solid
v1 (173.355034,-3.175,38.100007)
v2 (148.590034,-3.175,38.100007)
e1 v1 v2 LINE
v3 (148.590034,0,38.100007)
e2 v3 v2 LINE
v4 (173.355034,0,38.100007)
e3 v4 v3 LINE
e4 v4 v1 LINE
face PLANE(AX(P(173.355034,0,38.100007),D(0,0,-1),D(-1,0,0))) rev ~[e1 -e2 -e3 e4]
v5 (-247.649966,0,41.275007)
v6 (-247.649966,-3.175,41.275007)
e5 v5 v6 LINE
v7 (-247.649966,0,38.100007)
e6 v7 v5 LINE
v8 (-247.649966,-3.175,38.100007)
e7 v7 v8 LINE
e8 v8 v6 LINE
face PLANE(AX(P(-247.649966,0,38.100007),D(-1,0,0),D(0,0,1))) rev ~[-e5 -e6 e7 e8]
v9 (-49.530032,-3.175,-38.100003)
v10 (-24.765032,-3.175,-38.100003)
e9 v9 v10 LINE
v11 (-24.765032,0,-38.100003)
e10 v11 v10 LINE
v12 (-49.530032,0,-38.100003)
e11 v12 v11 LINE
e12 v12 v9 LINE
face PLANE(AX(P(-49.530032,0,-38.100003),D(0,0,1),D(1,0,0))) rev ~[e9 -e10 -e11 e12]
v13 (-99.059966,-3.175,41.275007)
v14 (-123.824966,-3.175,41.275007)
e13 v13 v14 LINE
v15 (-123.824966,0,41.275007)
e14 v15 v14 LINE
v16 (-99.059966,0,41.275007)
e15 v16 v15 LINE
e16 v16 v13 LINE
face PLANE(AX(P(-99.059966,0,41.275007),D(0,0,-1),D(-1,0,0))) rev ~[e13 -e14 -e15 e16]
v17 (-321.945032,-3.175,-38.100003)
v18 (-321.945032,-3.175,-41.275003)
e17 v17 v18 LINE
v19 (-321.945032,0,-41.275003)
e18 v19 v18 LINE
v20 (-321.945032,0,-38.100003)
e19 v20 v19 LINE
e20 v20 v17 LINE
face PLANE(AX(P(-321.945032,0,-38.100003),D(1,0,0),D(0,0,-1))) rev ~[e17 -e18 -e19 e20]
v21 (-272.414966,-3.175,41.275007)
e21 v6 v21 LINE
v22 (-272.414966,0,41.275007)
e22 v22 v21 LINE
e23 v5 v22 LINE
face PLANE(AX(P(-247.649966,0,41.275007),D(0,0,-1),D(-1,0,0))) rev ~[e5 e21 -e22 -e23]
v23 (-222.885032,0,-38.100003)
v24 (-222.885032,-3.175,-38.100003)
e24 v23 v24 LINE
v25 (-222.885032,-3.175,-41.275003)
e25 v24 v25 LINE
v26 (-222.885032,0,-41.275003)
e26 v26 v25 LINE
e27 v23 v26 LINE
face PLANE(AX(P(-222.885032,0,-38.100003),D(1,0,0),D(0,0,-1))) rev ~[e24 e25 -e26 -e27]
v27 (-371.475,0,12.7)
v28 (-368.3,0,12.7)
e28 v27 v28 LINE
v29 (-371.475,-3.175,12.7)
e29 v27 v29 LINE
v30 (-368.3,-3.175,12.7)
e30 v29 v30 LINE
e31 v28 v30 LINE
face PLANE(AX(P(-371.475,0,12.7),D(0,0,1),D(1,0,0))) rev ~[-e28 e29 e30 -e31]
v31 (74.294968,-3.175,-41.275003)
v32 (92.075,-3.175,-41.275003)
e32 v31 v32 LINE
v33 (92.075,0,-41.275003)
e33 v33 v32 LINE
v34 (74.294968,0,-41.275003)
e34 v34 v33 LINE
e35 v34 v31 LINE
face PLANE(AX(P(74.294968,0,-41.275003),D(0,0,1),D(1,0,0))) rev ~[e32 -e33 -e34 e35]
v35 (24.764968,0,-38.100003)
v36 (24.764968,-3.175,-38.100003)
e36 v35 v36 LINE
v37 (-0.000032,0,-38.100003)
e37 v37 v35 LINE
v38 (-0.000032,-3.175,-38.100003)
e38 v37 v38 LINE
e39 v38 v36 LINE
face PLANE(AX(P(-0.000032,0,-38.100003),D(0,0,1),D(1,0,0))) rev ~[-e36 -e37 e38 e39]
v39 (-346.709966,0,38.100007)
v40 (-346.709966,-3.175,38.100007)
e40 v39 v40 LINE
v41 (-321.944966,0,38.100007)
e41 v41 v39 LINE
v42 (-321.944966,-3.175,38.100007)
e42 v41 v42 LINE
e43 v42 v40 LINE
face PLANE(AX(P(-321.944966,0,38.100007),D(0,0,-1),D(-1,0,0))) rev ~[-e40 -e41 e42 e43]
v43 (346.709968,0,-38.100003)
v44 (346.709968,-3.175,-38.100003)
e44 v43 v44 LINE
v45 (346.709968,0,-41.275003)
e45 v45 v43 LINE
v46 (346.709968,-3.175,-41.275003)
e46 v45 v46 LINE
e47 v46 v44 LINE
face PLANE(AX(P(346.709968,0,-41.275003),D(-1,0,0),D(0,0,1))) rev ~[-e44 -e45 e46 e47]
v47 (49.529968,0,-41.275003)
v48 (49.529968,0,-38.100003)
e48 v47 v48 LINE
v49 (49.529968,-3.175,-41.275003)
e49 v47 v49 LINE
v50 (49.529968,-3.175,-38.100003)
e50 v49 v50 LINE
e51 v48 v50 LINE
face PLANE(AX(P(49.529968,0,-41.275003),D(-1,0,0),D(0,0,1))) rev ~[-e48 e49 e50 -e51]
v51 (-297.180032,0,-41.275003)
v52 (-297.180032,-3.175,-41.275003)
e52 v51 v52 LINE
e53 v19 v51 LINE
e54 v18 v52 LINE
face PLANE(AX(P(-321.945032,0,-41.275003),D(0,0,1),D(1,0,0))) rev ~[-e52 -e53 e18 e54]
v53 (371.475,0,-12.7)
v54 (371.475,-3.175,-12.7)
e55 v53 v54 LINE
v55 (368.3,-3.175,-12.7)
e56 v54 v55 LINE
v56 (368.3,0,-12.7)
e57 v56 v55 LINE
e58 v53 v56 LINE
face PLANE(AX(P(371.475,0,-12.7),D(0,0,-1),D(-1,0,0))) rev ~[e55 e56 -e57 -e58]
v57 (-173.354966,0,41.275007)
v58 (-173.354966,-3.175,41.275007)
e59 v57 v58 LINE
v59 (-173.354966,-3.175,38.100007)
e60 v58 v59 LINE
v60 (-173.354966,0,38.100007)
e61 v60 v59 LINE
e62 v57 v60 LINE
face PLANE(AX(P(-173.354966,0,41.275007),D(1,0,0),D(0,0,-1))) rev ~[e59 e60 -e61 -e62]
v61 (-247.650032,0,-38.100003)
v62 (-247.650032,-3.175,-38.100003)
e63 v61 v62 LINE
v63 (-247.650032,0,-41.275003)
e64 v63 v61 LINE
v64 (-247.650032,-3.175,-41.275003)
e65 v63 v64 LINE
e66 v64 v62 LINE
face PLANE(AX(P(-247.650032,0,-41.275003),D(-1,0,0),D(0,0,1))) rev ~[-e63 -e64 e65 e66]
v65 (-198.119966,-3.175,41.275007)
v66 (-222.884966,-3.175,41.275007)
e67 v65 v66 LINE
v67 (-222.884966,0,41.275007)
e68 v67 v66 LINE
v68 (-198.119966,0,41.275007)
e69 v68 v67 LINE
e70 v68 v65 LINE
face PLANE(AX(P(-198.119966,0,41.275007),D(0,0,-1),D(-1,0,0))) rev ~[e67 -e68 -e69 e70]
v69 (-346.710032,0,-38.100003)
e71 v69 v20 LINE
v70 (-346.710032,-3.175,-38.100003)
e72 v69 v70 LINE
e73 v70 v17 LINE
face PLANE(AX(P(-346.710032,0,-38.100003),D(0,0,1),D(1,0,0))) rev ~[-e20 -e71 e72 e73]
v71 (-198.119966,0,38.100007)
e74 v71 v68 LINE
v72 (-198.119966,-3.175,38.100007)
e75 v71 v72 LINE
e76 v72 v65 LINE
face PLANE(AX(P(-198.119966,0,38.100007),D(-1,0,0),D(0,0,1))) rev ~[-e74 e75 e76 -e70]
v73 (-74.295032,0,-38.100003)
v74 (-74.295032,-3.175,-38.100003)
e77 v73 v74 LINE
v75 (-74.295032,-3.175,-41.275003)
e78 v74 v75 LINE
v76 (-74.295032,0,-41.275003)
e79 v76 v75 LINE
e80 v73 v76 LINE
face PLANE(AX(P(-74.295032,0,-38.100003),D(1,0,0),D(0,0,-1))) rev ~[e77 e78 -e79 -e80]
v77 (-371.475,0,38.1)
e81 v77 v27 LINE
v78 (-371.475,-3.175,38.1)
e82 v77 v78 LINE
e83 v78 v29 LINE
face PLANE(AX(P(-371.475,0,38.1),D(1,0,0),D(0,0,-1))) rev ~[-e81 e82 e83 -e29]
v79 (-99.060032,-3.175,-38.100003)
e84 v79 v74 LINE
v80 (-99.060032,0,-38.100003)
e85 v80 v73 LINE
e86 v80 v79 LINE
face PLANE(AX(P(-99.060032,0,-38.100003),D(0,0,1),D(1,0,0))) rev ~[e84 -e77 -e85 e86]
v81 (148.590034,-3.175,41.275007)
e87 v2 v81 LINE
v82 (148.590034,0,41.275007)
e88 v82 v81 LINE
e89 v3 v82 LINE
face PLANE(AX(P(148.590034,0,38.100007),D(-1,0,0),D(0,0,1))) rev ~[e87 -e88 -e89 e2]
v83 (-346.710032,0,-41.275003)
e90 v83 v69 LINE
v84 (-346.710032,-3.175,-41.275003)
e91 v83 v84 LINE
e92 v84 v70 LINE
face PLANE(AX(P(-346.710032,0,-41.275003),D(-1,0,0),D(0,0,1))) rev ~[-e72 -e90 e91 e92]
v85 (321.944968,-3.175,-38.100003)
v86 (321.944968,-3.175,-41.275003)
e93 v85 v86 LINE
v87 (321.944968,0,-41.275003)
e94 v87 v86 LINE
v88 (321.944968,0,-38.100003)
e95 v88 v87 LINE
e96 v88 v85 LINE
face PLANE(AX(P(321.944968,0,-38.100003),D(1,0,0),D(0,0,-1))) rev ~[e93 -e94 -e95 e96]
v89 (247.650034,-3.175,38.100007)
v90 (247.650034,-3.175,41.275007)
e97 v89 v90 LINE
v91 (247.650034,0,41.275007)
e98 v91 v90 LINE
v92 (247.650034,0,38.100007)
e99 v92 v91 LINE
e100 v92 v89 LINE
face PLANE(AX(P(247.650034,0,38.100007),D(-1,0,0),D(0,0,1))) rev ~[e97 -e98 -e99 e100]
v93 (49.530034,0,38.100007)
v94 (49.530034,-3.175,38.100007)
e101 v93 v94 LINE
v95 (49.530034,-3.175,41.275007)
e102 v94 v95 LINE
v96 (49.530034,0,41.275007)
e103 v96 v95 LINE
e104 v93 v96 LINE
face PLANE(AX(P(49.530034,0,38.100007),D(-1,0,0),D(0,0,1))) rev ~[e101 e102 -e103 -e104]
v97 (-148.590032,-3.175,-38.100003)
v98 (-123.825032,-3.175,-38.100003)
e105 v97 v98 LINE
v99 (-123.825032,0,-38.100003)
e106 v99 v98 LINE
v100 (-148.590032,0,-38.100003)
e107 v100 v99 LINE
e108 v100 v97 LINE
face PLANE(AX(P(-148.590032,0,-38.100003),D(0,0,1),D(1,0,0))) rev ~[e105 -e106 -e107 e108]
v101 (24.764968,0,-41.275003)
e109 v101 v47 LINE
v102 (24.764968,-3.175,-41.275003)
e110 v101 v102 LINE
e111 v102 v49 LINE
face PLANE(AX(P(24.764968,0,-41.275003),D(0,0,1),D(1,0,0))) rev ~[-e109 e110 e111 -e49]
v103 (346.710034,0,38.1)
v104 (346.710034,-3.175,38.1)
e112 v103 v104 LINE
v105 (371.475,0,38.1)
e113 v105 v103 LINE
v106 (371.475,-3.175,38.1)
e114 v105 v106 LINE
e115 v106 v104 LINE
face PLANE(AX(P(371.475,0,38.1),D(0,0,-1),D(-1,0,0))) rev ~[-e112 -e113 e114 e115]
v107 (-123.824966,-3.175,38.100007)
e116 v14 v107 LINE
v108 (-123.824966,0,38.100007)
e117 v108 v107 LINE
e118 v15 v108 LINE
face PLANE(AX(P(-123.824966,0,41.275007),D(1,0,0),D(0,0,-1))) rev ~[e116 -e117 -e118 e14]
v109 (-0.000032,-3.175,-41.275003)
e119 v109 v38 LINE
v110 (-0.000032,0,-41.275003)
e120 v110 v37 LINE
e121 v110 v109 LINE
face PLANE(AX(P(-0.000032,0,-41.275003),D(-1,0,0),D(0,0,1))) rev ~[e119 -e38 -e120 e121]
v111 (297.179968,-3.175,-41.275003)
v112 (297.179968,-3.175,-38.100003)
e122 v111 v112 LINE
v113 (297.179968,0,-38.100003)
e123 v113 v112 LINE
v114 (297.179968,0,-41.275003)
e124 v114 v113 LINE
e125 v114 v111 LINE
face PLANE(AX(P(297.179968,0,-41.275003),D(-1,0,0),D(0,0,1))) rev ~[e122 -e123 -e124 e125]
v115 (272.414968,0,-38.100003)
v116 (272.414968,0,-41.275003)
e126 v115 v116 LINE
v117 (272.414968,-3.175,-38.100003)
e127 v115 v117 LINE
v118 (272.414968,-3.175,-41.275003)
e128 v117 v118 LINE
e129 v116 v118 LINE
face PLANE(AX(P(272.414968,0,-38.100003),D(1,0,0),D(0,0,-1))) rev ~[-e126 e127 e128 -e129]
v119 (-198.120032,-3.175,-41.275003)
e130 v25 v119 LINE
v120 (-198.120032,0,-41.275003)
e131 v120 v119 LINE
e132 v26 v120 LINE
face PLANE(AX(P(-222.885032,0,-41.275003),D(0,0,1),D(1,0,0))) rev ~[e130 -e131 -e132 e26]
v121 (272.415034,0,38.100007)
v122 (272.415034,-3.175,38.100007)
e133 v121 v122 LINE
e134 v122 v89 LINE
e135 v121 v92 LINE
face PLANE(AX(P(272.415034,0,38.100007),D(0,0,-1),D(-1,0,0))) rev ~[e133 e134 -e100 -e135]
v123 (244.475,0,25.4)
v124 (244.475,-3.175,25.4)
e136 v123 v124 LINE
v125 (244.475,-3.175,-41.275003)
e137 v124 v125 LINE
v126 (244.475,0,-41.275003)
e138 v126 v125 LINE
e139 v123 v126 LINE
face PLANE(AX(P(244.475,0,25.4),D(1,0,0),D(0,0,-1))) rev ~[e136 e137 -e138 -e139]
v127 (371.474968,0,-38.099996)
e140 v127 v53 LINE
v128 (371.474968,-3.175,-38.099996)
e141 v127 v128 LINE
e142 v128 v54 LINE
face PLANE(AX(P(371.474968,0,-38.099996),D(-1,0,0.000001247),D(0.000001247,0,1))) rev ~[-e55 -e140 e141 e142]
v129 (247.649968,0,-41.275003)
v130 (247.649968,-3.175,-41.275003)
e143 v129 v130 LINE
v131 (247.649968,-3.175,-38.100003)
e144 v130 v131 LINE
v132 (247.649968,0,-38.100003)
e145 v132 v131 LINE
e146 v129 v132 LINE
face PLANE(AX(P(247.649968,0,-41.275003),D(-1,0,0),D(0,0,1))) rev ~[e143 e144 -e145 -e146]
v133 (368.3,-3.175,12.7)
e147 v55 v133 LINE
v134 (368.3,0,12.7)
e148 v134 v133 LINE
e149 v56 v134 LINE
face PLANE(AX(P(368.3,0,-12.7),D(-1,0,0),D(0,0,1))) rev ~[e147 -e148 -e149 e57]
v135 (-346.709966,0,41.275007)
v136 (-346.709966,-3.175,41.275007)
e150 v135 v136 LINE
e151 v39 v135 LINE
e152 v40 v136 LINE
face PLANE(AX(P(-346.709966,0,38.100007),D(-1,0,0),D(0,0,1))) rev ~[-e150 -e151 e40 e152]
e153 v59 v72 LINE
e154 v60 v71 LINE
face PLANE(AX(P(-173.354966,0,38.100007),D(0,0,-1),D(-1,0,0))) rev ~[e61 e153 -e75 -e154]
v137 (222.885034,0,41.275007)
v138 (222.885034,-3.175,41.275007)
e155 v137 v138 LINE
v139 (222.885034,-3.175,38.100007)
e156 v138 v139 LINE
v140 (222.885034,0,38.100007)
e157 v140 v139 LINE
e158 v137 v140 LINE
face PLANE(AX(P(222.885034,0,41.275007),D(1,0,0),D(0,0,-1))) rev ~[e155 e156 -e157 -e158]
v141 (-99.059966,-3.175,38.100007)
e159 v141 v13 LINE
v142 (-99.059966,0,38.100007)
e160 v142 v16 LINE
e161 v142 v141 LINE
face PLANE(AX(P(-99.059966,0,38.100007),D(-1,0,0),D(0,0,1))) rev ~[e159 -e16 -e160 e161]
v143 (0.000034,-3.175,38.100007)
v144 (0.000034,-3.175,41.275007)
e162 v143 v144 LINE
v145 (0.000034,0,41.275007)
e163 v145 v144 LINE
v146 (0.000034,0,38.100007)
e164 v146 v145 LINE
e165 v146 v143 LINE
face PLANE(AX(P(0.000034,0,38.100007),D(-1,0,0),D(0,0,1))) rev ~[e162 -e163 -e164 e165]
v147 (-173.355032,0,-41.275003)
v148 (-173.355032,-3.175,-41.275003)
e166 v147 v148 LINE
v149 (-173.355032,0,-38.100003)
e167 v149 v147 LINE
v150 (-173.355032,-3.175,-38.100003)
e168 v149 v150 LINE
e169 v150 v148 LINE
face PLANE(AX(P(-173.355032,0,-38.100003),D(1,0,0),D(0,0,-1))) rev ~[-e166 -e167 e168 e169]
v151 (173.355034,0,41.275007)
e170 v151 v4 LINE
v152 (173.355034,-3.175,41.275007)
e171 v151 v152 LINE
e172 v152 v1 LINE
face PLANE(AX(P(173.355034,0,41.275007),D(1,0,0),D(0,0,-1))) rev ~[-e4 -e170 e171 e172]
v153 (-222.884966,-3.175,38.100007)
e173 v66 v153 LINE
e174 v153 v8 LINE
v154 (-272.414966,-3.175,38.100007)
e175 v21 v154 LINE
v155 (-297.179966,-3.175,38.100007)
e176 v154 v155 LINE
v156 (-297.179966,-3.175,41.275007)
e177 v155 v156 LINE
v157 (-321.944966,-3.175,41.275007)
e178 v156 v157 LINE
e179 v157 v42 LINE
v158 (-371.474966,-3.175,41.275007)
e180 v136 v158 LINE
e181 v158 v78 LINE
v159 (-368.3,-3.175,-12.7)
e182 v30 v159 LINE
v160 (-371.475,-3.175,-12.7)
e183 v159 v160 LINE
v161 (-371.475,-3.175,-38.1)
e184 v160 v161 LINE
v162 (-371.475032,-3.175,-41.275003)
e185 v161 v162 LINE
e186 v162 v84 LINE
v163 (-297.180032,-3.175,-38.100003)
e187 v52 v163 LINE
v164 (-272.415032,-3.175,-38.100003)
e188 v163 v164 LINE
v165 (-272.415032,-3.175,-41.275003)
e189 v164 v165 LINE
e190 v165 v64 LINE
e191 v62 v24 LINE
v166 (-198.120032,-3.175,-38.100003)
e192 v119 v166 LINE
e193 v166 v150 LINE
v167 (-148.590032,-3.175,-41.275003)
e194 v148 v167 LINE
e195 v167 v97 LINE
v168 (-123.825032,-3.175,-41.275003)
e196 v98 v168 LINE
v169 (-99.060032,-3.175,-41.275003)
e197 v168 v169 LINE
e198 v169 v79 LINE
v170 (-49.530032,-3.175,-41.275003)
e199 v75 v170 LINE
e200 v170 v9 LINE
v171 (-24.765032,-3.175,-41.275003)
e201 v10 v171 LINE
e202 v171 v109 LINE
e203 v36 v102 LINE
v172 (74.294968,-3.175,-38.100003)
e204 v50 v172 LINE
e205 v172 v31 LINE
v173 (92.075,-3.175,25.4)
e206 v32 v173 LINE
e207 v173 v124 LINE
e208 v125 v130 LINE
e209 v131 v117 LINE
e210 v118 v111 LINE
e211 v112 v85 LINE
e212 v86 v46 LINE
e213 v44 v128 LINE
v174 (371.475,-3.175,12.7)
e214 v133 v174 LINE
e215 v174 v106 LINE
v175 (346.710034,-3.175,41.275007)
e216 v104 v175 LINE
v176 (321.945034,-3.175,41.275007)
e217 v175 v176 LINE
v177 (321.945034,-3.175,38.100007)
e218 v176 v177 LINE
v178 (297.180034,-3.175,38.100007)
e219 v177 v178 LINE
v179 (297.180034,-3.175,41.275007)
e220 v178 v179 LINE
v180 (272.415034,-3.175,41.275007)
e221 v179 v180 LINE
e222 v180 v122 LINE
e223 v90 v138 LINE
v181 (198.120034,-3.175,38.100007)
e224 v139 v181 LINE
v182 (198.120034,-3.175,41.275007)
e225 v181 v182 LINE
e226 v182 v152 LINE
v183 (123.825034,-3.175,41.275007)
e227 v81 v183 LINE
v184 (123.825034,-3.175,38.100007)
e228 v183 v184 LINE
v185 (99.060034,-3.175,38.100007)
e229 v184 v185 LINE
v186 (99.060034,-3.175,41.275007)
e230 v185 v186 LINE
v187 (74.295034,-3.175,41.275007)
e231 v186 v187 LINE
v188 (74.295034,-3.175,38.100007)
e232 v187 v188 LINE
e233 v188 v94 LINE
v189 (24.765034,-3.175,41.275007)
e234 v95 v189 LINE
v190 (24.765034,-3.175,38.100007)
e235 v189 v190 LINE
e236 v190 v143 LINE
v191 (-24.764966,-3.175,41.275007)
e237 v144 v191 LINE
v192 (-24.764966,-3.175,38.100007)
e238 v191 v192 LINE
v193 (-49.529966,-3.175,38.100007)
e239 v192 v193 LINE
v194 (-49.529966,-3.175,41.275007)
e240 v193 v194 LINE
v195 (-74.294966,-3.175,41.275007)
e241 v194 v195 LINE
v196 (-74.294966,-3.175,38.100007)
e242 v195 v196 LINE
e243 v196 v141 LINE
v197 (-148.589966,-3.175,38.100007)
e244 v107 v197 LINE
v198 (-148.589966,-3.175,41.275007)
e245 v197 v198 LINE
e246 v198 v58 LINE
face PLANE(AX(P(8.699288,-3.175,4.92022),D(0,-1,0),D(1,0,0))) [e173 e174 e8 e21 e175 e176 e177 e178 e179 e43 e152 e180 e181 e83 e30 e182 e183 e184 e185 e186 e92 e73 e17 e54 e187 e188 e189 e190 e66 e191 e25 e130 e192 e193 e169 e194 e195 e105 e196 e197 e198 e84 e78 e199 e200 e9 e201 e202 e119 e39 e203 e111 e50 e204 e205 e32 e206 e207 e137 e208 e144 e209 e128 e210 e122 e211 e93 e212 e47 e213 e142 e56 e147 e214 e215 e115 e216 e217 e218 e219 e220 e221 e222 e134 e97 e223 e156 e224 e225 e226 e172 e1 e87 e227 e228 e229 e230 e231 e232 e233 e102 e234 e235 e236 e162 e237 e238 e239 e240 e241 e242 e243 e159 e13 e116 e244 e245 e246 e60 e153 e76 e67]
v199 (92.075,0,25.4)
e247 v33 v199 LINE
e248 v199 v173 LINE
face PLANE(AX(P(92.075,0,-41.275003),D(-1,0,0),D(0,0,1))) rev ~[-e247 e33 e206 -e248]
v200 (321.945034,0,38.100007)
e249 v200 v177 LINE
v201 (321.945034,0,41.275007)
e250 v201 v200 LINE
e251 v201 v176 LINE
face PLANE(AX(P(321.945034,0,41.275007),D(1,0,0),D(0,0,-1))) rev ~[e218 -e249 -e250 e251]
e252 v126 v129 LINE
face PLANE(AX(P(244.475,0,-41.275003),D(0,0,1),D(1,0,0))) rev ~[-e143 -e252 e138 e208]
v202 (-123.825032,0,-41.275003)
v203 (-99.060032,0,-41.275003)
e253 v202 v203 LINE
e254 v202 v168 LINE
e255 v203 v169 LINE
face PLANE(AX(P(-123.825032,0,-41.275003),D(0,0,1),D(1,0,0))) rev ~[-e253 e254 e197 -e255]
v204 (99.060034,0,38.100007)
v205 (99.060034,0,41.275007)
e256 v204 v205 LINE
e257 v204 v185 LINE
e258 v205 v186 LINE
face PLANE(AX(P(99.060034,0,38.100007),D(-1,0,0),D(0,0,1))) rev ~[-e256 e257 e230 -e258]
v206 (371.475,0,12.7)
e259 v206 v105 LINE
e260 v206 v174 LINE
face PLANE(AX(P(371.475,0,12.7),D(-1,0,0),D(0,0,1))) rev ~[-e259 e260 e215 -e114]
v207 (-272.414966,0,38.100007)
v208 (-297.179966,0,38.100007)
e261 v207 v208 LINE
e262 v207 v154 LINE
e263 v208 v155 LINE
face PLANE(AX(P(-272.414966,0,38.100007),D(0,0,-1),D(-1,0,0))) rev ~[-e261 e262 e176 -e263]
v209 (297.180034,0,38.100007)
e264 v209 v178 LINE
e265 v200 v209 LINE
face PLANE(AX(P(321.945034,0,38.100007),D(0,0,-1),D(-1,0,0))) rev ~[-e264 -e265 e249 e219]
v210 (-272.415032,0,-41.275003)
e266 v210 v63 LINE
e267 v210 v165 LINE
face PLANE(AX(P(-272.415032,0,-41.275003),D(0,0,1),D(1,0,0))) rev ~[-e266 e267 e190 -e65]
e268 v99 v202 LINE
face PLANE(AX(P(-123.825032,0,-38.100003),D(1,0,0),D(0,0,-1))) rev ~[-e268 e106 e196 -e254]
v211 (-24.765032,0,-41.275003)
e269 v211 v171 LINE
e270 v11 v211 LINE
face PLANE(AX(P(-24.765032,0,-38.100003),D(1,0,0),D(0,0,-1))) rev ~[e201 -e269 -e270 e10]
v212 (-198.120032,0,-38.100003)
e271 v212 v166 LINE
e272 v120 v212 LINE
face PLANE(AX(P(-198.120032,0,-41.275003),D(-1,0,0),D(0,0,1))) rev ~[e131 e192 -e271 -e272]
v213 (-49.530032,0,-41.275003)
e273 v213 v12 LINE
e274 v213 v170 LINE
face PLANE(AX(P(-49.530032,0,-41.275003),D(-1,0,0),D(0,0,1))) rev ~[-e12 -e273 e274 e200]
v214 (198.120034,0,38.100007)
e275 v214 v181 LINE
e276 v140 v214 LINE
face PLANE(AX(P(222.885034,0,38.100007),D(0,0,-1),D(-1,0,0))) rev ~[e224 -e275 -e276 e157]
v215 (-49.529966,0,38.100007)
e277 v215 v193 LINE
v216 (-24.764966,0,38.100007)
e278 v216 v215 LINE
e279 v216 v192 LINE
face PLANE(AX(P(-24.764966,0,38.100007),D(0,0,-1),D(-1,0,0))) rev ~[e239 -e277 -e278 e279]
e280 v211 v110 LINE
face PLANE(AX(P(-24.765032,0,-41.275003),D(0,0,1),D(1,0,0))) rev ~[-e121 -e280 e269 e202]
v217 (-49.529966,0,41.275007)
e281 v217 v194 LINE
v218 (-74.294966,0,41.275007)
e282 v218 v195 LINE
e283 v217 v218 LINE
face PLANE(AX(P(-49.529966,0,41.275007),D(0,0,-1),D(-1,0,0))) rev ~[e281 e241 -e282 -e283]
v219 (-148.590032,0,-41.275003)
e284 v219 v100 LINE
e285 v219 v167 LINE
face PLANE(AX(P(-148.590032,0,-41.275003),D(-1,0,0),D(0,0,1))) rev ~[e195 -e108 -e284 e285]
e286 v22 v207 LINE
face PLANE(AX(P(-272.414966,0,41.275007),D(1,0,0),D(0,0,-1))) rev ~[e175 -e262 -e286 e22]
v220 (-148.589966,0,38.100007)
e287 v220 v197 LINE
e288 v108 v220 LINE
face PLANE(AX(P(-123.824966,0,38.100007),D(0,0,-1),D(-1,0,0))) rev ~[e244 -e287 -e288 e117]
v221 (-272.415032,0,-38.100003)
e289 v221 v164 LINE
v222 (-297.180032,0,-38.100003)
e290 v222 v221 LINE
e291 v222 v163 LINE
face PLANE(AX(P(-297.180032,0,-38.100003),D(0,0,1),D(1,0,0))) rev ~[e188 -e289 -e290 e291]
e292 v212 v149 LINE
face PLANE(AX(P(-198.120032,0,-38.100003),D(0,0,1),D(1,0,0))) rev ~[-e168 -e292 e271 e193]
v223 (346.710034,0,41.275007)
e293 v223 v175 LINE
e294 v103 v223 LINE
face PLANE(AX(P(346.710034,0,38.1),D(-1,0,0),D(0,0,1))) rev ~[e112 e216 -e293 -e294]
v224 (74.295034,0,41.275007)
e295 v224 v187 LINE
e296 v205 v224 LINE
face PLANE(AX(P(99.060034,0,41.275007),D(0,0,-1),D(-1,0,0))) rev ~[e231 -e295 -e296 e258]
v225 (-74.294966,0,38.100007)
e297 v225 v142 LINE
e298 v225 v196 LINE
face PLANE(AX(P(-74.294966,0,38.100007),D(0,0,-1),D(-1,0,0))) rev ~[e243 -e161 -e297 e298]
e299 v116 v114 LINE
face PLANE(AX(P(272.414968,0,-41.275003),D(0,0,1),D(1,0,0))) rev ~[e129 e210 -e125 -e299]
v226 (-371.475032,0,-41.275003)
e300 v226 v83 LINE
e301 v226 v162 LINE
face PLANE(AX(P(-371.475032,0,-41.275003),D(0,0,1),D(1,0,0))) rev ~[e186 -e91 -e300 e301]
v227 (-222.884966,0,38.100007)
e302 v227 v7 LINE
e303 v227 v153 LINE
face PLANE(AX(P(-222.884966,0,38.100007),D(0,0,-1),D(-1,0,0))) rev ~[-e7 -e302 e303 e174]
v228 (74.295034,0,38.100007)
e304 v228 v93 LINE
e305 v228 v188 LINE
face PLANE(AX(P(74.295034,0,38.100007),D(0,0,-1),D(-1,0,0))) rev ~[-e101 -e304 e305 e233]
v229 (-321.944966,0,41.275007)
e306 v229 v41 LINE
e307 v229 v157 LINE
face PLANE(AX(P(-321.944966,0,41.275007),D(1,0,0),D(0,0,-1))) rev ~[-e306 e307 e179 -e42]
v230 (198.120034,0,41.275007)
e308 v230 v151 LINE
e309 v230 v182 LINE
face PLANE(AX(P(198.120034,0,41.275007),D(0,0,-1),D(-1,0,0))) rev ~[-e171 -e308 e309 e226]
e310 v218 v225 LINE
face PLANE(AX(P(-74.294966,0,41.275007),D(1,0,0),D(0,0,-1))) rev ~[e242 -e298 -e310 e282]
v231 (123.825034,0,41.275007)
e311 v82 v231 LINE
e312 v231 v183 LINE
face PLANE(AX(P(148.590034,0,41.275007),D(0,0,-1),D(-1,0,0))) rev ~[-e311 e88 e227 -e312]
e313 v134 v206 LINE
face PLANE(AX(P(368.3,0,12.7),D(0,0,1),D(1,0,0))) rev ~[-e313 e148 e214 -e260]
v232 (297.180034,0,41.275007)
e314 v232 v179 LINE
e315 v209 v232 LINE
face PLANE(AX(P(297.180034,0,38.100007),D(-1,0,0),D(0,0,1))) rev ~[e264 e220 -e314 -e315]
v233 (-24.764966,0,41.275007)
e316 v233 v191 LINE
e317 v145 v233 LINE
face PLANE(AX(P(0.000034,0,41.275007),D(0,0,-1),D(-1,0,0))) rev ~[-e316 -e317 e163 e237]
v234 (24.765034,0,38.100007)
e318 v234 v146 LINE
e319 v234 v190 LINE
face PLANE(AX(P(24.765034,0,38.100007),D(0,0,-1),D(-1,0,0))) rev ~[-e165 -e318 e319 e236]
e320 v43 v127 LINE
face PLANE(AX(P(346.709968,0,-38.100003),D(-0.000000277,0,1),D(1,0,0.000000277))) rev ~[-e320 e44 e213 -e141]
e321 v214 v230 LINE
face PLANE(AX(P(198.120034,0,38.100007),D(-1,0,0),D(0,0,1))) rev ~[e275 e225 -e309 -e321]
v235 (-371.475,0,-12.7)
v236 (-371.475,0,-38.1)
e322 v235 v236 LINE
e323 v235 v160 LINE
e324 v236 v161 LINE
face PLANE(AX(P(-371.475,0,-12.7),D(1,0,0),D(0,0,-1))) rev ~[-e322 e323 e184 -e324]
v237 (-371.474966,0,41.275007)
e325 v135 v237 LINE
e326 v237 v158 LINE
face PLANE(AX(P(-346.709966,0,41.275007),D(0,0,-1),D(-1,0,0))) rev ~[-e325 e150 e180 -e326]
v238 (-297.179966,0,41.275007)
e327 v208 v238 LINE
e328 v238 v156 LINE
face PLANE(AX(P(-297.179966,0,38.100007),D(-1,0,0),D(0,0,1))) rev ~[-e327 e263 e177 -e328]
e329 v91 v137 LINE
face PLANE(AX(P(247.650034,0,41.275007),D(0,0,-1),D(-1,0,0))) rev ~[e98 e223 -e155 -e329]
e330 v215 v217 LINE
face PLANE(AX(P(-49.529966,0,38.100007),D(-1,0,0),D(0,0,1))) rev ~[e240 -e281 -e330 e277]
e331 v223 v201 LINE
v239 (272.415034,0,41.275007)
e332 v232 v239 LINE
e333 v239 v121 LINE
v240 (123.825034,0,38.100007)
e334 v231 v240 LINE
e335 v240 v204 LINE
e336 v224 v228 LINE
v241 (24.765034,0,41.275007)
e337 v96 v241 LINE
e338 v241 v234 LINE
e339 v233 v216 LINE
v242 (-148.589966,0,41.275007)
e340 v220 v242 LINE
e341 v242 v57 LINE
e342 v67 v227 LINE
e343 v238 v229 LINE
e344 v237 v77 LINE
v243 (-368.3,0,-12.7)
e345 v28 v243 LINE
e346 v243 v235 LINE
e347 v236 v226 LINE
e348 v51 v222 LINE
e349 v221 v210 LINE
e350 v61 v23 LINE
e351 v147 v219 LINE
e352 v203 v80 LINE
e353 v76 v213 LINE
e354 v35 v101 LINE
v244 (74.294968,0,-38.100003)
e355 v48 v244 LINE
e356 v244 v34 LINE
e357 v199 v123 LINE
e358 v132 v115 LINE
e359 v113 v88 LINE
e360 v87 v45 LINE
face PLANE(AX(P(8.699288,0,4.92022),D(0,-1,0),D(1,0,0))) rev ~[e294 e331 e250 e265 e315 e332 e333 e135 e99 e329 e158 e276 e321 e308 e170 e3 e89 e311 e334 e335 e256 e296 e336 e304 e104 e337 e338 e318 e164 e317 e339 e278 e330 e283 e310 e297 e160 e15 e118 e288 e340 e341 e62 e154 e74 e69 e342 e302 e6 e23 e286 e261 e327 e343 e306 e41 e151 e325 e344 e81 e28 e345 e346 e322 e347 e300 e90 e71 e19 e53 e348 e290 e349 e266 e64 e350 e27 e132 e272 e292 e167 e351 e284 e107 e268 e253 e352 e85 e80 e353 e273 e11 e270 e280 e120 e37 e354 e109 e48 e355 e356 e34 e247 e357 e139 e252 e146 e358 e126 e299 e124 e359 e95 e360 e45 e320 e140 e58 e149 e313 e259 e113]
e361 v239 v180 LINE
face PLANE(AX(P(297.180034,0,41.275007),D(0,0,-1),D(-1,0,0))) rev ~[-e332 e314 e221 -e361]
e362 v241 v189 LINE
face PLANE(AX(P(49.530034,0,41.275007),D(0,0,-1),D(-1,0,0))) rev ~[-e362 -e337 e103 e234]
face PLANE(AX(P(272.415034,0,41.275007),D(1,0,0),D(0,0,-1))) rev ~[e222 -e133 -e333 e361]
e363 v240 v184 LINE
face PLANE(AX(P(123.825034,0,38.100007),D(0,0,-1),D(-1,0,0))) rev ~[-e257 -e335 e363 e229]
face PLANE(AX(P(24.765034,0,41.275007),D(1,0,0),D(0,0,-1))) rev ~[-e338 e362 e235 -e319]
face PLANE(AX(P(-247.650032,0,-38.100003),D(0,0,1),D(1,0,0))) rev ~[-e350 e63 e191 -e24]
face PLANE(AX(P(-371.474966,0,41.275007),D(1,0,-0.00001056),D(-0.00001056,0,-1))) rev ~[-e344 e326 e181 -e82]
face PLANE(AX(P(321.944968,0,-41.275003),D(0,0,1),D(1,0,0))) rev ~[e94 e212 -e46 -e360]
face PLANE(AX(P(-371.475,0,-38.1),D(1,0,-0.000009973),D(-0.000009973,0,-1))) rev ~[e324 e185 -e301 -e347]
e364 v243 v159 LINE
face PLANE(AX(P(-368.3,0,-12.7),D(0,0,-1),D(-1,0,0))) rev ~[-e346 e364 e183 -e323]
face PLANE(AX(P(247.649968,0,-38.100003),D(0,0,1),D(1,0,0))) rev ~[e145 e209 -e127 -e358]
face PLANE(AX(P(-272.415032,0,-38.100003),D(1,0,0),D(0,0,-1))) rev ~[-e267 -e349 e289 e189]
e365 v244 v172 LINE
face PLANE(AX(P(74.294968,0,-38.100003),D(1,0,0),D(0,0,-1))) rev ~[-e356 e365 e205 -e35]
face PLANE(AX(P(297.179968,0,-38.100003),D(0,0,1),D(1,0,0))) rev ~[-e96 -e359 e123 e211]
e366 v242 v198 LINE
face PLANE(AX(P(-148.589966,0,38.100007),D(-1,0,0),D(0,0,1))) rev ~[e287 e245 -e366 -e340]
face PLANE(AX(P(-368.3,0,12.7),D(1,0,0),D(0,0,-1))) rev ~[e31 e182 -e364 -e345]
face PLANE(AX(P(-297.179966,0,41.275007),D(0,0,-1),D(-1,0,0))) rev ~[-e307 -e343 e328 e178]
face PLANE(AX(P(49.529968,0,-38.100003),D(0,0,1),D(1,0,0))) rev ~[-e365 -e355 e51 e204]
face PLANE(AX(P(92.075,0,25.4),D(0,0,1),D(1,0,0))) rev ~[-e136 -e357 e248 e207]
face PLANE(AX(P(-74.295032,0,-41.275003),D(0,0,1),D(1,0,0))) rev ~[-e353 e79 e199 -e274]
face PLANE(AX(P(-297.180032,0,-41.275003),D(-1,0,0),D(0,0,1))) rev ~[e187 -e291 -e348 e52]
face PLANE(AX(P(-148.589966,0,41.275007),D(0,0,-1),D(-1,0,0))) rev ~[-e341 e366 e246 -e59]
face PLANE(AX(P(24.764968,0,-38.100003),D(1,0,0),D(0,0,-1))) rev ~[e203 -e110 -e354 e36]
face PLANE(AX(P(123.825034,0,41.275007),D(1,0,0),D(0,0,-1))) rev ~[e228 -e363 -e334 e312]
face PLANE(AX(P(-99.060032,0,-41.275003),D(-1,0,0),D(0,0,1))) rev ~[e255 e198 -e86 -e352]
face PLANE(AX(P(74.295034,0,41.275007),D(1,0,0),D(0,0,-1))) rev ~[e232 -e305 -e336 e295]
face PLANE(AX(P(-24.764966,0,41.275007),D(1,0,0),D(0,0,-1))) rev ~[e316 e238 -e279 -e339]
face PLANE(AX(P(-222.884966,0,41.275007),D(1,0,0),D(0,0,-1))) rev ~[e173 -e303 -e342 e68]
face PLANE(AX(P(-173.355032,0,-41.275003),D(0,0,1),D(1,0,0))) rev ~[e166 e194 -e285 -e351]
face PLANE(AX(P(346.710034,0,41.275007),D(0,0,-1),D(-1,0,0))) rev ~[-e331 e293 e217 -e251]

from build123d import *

# Parameters (mm, degrees)
F1_DEPTH = 3.175


# Not quite as in the source:
# - ends of sketch curves that miss each other by under 0.0002 mm in the source are joined


with BuildPart() as f1:
    # F0 (on Front) → F1 (new body)
    with BuildSketch(Plane.XZ):
        Polygon((92.075, 25.4), (244.475, 25.4), (244.475, -38.1), (244.475, -41.2750032454), (247.649968335, -41.2750032454), (247.649968335, -38.1000032454), (272.414968335, -38.1000032454), (272.414968335, -41.2750032454), (297.179968335, -41.2750032454), (297.179968335, -38.1000032454), (321.944968335, -38.1000032454), (321.944968335, -41.2750032454), (346.709968335, -41.2750032453), (346.709968335, -38.1000032454), (371.474968335, -38.0999963909), (371.475, -12.7), (368.3, -12.7), (368.3, 12.7), (371.475, 12.7), (371.475, 38.1), (368.3, 38.1), (346.7100335276, 38.1), (346.7100335276, 41.2750068545), (321.9450335276, 41.2750068544), (321.9450335276, 38.1000068545), (297.1800335276, 38.1000068545), (297.1800335276, 41.2750068545), (272.4150335276, 41.2750068545), (272.4150335276, 38.1000068545), (247.6500335276, 38.1000068545), (247.6500335276, 41.2750068545), (222.8850335276, 41.2750068545), (222.8850335276, 38.1000068545), (198.1200335276, 38.1000068545), (198.1200335276, 41.2750068545), (173.3550335276, 41.2750068545), (173.3550335276, 38.1000068545), (148.5900335276, 38.1000068545), (148.5900335276, 41.2750068545), (123.8250335276, 41.2750068545), (123.8250335276, 38.1000068545), (99.0600335276, 38.1000068545), (99.0600335276, 41.2750068545), (74.2950335276, 41.2750068545), (74.2950335276, 38.1000068545), (49.5300335276, 38.1000068545), (49.5300335276, 41.2750068545), (24.7650335276, 41.2750068545), (24.7650335276, 38.1000068545), (3.35276e-05, 38.1000068545), (3.35276e-05, 41.2750068545), (-24.7649664724, 41.2750068545), (-24.7649664724, 38.1000068545), (-49.5299664724, 38.1000068545), (-49.5299664724, 41.2750068545), (-74.2949664724, 41.2750068545), (-74.2949664724, 38.1000068545), (-99.0599664724, 38.1000068545), (-99.0599664724, 41.2750068545), (-123.8249664724, 41.2750068545), (-123.8249664724, 38.1000068545), (-148.5899664724, 38.1000068545), (-148.5899664724, 41.2750068545), (-173.3549664724, 41.2750068545), (-173.3549664724, 38.1000068545), (-198.1199664724, 38.1000068545), (-198.1199664724, 41.2750068545), (-222.8849664724, 41.2750068545), (-222.8849664724, 38.1000068545), (-247.6499664724, 38.1000068545), (-247.6499664724, 41.2750068545), (-272.4149664724, 41.2750068545), (-272.4149664724, 38.1000068545), (-297.1799664724, 38.1000068545), (-297.1799664724, 41.2750068545), (-321.9449664724, 41.2750068545), (-321.9449664724, 38.1000068545), (-346.7099664724, 38.1000068545), (-346.7099664724, 41.2750068545), (-371.4749664724, 41.2750068545), (-371.475, 38.1), (-371.475, 12.7), (-368.3, 12.7), (-368.3, -12.7), (-371.475, -12.7), (-371.475, -38.1), (-371.475031665, -41.2750032454), (-346.710031665, -41.2750032454), (-346.710031665, -38.1000032454), (-321.945031665, -38.1000032454), (-321.945031665, -41.2750032454), (-297.180031665, -41.2750032454), (-297.180031665, -38.1000032454), (-272.415031665, -38.1000032454), (-272.415031665, -41.2750032454), (-247.650031665, -41.2750032454), (-247.650031665, -38.1000032454), (-222.885031665, -38.1000032454), (-222.885031665, -41.2750032454), (-198.120031665, -41.2750032454), (-198.120031665, -38.1000032454), (-173.355031665, -38.1000032454), (-173.355031665, -41.2750032454), (-148.590031665, -41.2750032454), (-148.590031665, -38.1000032454), (-123.825031665, -38.1000032454), (-123.825031665, -41.2750032454), (-99.060031665, -41.2750032454), (-99.060031665, -38.1000032454), (-74.295031665, -38.1000032454), (-74.295031665, -41.2750032454), (-49.530031665, -41.2750032454), (-49.530031665, -38.1000032454), (-24.765031665, -38.1000032454), (-24.765031665, -41.2750032454), (-3.1665e-05, -41.2750032454), (-3.1665e-05, -38.1000032454), (24.764968335, -38.1000032454), (24.764968335, -41.2750032454), (49.529968335, -41.2750032454), (49.529968335, -38.1000032454), (74.294968335, -38.1000032454), (74.294968335, -41.2750032454), (92.075, -41.2750032454), (92.075, -38.1), align=None)
    extrude(amount=F1_DEPTH)


solid = f1.part
